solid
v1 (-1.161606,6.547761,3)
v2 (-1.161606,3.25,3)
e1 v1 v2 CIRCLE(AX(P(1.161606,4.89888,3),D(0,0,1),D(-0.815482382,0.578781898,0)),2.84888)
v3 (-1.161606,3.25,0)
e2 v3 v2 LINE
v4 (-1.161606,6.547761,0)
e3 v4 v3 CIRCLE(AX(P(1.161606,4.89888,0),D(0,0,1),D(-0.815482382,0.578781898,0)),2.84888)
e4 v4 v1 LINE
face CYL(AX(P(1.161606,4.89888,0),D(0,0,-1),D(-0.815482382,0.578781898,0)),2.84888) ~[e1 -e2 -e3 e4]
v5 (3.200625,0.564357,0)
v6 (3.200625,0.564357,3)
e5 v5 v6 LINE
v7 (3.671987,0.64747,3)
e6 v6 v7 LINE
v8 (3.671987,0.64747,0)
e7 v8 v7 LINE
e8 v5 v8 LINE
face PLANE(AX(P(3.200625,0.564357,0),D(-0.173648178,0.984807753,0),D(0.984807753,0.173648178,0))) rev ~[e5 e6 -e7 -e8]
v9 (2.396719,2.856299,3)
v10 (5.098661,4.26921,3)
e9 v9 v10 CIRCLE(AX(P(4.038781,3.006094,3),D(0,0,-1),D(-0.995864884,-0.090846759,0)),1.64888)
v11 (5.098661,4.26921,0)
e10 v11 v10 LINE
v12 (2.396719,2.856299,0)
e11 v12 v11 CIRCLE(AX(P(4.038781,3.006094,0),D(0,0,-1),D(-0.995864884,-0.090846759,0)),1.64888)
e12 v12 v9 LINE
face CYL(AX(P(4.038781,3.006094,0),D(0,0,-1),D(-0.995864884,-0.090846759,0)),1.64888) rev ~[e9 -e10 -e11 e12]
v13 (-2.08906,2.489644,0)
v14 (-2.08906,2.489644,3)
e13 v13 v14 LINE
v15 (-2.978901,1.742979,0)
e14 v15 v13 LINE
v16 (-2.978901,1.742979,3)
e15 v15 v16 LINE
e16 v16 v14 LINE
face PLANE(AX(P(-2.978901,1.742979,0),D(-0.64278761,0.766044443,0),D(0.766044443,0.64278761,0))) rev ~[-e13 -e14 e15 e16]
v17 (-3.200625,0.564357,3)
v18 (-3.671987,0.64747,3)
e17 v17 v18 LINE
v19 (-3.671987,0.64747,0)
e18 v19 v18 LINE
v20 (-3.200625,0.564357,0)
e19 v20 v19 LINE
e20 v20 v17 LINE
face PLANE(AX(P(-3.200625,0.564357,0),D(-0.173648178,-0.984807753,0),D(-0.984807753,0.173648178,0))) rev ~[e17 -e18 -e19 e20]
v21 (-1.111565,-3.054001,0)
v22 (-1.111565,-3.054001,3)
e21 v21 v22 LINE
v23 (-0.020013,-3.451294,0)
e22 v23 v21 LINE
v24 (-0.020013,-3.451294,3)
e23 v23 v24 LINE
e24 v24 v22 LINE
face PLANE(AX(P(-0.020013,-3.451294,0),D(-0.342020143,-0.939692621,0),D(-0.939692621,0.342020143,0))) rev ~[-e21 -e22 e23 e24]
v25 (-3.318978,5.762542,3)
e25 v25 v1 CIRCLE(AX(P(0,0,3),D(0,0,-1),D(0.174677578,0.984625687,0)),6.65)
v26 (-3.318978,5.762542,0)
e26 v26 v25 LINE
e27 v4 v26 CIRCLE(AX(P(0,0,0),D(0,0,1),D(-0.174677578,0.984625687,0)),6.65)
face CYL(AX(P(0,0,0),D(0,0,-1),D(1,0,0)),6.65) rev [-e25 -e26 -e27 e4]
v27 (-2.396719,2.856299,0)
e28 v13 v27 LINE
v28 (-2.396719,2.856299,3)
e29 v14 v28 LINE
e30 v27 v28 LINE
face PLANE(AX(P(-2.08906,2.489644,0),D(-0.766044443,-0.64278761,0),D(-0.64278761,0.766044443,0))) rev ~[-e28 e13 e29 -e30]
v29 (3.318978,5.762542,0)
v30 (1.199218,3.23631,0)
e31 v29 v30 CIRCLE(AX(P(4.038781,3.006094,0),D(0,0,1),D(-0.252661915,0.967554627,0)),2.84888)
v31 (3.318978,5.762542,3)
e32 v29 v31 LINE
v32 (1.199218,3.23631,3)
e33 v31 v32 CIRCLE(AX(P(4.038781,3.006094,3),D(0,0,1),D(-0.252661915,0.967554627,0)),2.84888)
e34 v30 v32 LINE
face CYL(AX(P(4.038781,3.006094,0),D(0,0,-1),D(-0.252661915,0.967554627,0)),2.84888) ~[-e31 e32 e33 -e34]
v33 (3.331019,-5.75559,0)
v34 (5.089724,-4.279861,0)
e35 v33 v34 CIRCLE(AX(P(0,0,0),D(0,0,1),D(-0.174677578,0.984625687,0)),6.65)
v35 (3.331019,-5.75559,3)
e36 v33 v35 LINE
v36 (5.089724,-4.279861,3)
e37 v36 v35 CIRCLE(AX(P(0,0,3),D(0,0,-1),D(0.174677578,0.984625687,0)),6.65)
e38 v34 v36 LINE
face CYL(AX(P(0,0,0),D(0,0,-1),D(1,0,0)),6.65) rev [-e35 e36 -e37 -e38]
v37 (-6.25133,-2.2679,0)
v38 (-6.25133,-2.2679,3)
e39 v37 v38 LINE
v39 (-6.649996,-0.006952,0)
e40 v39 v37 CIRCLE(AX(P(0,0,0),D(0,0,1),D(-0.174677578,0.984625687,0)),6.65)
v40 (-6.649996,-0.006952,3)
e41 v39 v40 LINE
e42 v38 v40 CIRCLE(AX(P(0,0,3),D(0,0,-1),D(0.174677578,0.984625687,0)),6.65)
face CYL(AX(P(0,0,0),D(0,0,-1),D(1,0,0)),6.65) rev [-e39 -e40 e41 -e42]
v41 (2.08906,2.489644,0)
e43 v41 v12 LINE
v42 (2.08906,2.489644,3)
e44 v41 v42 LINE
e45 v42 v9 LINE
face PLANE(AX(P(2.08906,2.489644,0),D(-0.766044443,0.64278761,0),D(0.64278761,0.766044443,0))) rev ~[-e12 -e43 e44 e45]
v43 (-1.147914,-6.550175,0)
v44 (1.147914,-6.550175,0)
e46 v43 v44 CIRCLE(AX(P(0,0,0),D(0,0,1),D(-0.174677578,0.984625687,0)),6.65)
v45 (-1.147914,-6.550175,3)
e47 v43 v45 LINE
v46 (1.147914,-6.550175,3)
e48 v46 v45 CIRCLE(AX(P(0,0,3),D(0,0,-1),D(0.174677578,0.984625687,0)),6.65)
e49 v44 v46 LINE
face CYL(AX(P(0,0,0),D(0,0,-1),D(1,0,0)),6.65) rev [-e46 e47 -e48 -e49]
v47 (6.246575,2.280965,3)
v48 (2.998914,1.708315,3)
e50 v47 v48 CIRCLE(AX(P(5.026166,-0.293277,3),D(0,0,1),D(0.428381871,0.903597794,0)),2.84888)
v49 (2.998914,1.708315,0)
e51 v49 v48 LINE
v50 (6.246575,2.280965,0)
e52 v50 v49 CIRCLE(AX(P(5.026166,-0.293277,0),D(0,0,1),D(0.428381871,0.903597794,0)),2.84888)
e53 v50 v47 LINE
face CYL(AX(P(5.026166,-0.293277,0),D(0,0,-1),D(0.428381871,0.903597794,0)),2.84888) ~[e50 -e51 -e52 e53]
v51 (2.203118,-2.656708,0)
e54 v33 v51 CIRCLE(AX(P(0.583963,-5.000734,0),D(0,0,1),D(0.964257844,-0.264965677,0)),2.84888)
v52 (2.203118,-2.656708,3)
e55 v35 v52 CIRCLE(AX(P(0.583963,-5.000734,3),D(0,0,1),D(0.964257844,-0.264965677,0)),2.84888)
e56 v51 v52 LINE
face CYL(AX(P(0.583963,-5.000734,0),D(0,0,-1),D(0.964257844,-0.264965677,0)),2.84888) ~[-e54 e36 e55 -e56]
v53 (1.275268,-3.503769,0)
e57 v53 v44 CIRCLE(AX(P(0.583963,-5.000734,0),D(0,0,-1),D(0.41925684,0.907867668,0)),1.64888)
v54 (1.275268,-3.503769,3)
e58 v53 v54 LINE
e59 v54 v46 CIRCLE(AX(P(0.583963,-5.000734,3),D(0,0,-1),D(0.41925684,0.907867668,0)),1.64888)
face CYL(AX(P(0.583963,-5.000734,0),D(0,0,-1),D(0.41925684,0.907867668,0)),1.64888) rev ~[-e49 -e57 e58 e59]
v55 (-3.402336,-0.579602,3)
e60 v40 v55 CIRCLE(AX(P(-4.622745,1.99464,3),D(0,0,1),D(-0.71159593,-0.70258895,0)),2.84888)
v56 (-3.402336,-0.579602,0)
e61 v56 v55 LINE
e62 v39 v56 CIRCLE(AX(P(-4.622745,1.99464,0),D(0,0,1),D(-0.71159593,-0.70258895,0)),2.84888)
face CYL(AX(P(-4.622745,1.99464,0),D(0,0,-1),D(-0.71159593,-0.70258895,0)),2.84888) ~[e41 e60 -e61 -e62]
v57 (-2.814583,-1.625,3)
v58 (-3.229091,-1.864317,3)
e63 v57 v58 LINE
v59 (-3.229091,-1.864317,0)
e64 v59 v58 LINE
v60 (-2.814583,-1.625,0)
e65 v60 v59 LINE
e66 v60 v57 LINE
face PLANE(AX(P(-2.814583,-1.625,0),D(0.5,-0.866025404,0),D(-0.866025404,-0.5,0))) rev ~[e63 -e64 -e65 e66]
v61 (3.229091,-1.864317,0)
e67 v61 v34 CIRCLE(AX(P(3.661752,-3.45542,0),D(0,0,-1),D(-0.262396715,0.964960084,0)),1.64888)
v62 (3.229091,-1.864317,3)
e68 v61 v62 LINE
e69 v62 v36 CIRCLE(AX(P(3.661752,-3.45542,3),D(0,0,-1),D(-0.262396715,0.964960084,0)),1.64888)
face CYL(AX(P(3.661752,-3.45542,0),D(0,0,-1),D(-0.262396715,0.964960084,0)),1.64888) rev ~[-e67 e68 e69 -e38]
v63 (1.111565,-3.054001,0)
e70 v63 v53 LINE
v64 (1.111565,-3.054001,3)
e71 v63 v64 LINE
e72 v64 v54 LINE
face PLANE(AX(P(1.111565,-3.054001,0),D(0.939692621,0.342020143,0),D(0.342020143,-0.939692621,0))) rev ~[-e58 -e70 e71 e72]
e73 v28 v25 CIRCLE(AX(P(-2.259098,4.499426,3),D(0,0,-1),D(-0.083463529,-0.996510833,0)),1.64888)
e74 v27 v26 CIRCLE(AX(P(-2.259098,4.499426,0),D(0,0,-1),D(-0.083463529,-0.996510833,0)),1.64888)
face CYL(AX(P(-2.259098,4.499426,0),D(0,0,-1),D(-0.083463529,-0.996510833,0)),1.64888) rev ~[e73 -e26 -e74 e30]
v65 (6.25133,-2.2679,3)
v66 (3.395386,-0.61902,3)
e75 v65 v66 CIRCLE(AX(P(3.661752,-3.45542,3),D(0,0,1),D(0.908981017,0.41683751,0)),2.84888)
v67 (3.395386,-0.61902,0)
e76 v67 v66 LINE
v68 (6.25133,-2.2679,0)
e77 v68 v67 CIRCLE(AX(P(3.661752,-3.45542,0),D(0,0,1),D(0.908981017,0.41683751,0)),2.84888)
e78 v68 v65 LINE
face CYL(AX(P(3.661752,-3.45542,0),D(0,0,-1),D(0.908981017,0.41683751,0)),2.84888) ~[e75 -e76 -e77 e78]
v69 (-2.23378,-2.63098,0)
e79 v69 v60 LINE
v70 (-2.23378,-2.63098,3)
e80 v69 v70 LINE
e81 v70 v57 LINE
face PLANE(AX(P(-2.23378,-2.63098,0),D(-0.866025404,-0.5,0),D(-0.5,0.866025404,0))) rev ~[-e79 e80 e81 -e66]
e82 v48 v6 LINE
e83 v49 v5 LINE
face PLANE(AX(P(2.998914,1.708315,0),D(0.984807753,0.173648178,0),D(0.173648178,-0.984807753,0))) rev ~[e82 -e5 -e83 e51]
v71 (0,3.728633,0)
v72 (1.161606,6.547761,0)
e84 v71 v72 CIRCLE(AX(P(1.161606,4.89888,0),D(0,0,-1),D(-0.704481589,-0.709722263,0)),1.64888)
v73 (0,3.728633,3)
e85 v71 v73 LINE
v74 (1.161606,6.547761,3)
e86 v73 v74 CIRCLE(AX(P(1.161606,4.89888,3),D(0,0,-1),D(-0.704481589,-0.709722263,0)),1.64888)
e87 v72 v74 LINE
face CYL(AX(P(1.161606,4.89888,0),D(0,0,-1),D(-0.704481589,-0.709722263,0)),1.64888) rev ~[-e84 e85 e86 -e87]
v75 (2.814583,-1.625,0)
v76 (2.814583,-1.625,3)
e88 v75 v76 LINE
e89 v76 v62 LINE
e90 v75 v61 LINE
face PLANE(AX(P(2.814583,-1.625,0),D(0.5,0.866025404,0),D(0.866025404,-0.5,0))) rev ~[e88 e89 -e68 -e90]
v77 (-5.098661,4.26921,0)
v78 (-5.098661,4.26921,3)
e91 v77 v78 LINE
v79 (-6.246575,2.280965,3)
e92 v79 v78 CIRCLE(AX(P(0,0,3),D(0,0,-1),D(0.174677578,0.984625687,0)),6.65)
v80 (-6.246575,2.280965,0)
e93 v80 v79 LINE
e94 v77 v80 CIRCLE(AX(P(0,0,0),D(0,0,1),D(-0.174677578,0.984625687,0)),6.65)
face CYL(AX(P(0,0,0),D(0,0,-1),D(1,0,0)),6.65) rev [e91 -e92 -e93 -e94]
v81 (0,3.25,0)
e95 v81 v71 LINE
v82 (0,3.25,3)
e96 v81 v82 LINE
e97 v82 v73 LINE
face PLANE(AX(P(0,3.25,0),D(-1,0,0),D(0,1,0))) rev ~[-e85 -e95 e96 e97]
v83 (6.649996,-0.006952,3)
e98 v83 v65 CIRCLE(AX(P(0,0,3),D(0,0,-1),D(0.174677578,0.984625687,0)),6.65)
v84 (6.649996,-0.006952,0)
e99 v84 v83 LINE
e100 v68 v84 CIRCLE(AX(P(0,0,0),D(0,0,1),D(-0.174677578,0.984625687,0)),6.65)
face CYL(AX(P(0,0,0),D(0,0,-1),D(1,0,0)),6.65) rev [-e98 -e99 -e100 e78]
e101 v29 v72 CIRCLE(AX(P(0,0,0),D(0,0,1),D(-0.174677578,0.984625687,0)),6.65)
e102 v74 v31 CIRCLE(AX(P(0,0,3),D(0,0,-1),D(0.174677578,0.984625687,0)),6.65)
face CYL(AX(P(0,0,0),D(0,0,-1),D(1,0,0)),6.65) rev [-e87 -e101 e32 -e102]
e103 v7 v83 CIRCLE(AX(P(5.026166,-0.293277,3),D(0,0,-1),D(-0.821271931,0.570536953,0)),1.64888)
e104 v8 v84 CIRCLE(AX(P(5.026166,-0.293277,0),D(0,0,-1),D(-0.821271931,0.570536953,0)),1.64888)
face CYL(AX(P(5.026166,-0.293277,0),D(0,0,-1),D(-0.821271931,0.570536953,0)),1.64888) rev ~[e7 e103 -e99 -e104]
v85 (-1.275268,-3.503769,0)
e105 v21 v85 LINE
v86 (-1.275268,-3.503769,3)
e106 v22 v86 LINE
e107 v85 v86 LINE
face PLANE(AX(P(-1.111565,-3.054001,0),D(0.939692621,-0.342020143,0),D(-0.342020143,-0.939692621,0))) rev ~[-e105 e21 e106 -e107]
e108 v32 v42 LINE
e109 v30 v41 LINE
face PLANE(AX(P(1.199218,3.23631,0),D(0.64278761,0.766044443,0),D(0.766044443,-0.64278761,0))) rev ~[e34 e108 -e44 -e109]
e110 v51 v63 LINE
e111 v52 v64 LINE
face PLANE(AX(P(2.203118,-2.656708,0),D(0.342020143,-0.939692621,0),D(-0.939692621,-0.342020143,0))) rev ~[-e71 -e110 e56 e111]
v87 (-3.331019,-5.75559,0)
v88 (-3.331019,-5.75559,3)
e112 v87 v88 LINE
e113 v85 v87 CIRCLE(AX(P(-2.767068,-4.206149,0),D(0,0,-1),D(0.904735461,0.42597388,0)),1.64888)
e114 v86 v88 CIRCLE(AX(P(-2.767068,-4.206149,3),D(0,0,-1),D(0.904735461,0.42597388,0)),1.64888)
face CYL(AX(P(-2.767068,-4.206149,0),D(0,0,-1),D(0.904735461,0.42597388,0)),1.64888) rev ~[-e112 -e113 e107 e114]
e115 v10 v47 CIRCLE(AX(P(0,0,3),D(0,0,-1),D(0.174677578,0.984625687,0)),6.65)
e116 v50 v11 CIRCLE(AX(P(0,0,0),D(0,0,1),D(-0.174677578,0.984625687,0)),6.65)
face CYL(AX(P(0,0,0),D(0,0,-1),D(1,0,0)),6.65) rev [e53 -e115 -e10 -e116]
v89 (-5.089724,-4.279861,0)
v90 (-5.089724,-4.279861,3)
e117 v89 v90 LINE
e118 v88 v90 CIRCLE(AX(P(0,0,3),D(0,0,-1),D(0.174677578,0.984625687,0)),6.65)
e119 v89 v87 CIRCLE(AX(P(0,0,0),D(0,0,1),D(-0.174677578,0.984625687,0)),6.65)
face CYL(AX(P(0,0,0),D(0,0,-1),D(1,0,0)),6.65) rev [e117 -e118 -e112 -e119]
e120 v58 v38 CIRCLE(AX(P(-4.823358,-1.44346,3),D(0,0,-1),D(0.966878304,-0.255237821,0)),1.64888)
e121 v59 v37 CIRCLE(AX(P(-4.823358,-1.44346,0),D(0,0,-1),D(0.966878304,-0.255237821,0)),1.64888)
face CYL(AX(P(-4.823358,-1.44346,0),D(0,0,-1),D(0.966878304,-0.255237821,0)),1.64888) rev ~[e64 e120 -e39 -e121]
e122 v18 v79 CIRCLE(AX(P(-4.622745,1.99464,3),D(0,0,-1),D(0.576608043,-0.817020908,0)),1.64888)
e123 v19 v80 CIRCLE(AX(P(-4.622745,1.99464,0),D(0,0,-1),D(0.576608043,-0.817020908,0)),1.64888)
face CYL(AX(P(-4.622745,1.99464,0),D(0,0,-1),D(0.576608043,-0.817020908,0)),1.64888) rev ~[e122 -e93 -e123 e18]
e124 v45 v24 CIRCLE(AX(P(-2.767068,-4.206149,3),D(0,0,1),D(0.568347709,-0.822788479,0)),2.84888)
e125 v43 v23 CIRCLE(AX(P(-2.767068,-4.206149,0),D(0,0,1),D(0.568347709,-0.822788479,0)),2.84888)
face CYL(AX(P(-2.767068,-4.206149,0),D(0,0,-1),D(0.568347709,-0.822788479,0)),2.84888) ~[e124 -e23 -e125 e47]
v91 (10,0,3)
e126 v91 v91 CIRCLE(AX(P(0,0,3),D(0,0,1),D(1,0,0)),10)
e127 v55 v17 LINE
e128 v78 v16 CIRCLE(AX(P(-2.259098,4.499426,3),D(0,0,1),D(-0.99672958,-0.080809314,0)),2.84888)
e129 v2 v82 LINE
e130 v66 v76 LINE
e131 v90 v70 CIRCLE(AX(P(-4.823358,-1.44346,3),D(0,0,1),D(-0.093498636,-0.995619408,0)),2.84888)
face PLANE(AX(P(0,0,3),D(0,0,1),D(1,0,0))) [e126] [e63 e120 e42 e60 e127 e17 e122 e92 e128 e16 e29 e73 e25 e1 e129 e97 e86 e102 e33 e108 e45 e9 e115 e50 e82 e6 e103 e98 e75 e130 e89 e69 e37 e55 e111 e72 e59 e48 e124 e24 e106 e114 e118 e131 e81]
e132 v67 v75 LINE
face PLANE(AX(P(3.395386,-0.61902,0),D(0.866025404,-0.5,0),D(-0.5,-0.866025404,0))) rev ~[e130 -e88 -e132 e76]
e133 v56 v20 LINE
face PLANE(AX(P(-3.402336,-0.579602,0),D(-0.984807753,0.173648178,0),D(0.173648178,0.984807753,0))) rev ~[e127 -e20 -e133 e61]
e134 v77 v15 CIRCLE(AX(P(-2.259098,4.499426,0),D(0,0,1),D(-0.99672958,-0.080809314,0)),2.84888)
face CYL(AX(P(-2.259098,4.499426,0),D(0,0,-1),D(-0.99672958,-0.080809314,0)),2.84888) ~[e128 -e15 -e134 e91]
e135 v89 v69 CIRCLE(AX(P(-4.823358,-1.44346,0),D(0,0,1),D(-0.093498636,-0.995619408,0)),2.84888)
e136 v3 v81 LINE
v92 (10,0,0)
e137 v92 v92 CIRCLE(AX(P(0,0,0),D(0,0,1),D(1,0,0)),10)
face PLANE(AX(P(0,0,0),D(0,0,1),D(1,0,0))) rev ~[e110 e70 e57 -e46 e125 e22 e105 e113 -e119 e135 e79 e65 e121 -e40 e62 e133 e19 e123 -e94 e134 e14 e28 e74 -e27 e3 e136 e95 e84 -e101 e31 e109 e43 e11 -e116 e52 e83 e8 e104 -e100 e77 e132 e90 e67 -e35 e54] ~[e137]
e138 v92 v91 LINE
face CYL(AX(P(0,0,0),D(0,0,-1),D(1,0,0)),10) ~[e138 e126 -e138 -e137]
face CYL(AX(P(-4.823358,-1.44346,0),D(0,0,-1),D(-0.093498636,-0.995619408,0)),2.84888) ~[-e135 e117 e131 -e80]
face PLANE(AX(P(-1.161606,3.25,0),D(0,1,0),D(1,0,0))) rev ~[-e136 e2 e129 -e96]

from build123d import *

# Parameters (mm, degrees)
F0_R            = 10
F0_R_2          = 6.65
F1_DEPTH        = 3
F3_DEPTH        = 3
F3_COPIES_COUNT = 9


# Not quite as in the source:
# - a pattern or mirror of a feature is missing from the dataset's text; its kind, count and spacing are read off the source's solid
# - a feature names something its author has since deleted; it is built from what else it names


with BuildPart() as f1:
    # F0 (on Top) → F1 (new body)
    with BuildSketch(Plane.XY):
        Circle(F0_R)
        Circle(F0_R_2, mode=Mode.SUBTRACT)
    extrude(amount=F1_DEPTH)

    # F2 (on Top) → F3 (join, through all)
    with BuildSketch(Plane.XY):
        with BuildLine():
            ThreePointArc((0, 3.7286332735), (-0.3629275105, 5.527055954), (1.161605891, 6.5477608199))
            ThreePointArc((1.161605891, 6.5477608199), (0, 6.65), (-1.161605891, 6.5477608199))
            ThreePointArc((-1.161605891, 6.5477608199), (-1.6872745189, 4.8988804099), (-1.161605891, 3.25))
            Line((-1.161605891, 3.25), (0, 3.25))
            Line((0, 3.25), (0, 3.7286332735))
        make_face()
    f3 = extrude(amount=F3_DEPTH)

    # F3_copies: F3 ×9 about axis
    f3_copies_axis = Axis((0, 0, 0), (0, 0, 1))
    for i in range(1, F3_COPIES_COUNT):
        add(f3.rotate(f3_copies_axis, i * 360 / F3_COPIES_COUNT))


solid = f1.part
